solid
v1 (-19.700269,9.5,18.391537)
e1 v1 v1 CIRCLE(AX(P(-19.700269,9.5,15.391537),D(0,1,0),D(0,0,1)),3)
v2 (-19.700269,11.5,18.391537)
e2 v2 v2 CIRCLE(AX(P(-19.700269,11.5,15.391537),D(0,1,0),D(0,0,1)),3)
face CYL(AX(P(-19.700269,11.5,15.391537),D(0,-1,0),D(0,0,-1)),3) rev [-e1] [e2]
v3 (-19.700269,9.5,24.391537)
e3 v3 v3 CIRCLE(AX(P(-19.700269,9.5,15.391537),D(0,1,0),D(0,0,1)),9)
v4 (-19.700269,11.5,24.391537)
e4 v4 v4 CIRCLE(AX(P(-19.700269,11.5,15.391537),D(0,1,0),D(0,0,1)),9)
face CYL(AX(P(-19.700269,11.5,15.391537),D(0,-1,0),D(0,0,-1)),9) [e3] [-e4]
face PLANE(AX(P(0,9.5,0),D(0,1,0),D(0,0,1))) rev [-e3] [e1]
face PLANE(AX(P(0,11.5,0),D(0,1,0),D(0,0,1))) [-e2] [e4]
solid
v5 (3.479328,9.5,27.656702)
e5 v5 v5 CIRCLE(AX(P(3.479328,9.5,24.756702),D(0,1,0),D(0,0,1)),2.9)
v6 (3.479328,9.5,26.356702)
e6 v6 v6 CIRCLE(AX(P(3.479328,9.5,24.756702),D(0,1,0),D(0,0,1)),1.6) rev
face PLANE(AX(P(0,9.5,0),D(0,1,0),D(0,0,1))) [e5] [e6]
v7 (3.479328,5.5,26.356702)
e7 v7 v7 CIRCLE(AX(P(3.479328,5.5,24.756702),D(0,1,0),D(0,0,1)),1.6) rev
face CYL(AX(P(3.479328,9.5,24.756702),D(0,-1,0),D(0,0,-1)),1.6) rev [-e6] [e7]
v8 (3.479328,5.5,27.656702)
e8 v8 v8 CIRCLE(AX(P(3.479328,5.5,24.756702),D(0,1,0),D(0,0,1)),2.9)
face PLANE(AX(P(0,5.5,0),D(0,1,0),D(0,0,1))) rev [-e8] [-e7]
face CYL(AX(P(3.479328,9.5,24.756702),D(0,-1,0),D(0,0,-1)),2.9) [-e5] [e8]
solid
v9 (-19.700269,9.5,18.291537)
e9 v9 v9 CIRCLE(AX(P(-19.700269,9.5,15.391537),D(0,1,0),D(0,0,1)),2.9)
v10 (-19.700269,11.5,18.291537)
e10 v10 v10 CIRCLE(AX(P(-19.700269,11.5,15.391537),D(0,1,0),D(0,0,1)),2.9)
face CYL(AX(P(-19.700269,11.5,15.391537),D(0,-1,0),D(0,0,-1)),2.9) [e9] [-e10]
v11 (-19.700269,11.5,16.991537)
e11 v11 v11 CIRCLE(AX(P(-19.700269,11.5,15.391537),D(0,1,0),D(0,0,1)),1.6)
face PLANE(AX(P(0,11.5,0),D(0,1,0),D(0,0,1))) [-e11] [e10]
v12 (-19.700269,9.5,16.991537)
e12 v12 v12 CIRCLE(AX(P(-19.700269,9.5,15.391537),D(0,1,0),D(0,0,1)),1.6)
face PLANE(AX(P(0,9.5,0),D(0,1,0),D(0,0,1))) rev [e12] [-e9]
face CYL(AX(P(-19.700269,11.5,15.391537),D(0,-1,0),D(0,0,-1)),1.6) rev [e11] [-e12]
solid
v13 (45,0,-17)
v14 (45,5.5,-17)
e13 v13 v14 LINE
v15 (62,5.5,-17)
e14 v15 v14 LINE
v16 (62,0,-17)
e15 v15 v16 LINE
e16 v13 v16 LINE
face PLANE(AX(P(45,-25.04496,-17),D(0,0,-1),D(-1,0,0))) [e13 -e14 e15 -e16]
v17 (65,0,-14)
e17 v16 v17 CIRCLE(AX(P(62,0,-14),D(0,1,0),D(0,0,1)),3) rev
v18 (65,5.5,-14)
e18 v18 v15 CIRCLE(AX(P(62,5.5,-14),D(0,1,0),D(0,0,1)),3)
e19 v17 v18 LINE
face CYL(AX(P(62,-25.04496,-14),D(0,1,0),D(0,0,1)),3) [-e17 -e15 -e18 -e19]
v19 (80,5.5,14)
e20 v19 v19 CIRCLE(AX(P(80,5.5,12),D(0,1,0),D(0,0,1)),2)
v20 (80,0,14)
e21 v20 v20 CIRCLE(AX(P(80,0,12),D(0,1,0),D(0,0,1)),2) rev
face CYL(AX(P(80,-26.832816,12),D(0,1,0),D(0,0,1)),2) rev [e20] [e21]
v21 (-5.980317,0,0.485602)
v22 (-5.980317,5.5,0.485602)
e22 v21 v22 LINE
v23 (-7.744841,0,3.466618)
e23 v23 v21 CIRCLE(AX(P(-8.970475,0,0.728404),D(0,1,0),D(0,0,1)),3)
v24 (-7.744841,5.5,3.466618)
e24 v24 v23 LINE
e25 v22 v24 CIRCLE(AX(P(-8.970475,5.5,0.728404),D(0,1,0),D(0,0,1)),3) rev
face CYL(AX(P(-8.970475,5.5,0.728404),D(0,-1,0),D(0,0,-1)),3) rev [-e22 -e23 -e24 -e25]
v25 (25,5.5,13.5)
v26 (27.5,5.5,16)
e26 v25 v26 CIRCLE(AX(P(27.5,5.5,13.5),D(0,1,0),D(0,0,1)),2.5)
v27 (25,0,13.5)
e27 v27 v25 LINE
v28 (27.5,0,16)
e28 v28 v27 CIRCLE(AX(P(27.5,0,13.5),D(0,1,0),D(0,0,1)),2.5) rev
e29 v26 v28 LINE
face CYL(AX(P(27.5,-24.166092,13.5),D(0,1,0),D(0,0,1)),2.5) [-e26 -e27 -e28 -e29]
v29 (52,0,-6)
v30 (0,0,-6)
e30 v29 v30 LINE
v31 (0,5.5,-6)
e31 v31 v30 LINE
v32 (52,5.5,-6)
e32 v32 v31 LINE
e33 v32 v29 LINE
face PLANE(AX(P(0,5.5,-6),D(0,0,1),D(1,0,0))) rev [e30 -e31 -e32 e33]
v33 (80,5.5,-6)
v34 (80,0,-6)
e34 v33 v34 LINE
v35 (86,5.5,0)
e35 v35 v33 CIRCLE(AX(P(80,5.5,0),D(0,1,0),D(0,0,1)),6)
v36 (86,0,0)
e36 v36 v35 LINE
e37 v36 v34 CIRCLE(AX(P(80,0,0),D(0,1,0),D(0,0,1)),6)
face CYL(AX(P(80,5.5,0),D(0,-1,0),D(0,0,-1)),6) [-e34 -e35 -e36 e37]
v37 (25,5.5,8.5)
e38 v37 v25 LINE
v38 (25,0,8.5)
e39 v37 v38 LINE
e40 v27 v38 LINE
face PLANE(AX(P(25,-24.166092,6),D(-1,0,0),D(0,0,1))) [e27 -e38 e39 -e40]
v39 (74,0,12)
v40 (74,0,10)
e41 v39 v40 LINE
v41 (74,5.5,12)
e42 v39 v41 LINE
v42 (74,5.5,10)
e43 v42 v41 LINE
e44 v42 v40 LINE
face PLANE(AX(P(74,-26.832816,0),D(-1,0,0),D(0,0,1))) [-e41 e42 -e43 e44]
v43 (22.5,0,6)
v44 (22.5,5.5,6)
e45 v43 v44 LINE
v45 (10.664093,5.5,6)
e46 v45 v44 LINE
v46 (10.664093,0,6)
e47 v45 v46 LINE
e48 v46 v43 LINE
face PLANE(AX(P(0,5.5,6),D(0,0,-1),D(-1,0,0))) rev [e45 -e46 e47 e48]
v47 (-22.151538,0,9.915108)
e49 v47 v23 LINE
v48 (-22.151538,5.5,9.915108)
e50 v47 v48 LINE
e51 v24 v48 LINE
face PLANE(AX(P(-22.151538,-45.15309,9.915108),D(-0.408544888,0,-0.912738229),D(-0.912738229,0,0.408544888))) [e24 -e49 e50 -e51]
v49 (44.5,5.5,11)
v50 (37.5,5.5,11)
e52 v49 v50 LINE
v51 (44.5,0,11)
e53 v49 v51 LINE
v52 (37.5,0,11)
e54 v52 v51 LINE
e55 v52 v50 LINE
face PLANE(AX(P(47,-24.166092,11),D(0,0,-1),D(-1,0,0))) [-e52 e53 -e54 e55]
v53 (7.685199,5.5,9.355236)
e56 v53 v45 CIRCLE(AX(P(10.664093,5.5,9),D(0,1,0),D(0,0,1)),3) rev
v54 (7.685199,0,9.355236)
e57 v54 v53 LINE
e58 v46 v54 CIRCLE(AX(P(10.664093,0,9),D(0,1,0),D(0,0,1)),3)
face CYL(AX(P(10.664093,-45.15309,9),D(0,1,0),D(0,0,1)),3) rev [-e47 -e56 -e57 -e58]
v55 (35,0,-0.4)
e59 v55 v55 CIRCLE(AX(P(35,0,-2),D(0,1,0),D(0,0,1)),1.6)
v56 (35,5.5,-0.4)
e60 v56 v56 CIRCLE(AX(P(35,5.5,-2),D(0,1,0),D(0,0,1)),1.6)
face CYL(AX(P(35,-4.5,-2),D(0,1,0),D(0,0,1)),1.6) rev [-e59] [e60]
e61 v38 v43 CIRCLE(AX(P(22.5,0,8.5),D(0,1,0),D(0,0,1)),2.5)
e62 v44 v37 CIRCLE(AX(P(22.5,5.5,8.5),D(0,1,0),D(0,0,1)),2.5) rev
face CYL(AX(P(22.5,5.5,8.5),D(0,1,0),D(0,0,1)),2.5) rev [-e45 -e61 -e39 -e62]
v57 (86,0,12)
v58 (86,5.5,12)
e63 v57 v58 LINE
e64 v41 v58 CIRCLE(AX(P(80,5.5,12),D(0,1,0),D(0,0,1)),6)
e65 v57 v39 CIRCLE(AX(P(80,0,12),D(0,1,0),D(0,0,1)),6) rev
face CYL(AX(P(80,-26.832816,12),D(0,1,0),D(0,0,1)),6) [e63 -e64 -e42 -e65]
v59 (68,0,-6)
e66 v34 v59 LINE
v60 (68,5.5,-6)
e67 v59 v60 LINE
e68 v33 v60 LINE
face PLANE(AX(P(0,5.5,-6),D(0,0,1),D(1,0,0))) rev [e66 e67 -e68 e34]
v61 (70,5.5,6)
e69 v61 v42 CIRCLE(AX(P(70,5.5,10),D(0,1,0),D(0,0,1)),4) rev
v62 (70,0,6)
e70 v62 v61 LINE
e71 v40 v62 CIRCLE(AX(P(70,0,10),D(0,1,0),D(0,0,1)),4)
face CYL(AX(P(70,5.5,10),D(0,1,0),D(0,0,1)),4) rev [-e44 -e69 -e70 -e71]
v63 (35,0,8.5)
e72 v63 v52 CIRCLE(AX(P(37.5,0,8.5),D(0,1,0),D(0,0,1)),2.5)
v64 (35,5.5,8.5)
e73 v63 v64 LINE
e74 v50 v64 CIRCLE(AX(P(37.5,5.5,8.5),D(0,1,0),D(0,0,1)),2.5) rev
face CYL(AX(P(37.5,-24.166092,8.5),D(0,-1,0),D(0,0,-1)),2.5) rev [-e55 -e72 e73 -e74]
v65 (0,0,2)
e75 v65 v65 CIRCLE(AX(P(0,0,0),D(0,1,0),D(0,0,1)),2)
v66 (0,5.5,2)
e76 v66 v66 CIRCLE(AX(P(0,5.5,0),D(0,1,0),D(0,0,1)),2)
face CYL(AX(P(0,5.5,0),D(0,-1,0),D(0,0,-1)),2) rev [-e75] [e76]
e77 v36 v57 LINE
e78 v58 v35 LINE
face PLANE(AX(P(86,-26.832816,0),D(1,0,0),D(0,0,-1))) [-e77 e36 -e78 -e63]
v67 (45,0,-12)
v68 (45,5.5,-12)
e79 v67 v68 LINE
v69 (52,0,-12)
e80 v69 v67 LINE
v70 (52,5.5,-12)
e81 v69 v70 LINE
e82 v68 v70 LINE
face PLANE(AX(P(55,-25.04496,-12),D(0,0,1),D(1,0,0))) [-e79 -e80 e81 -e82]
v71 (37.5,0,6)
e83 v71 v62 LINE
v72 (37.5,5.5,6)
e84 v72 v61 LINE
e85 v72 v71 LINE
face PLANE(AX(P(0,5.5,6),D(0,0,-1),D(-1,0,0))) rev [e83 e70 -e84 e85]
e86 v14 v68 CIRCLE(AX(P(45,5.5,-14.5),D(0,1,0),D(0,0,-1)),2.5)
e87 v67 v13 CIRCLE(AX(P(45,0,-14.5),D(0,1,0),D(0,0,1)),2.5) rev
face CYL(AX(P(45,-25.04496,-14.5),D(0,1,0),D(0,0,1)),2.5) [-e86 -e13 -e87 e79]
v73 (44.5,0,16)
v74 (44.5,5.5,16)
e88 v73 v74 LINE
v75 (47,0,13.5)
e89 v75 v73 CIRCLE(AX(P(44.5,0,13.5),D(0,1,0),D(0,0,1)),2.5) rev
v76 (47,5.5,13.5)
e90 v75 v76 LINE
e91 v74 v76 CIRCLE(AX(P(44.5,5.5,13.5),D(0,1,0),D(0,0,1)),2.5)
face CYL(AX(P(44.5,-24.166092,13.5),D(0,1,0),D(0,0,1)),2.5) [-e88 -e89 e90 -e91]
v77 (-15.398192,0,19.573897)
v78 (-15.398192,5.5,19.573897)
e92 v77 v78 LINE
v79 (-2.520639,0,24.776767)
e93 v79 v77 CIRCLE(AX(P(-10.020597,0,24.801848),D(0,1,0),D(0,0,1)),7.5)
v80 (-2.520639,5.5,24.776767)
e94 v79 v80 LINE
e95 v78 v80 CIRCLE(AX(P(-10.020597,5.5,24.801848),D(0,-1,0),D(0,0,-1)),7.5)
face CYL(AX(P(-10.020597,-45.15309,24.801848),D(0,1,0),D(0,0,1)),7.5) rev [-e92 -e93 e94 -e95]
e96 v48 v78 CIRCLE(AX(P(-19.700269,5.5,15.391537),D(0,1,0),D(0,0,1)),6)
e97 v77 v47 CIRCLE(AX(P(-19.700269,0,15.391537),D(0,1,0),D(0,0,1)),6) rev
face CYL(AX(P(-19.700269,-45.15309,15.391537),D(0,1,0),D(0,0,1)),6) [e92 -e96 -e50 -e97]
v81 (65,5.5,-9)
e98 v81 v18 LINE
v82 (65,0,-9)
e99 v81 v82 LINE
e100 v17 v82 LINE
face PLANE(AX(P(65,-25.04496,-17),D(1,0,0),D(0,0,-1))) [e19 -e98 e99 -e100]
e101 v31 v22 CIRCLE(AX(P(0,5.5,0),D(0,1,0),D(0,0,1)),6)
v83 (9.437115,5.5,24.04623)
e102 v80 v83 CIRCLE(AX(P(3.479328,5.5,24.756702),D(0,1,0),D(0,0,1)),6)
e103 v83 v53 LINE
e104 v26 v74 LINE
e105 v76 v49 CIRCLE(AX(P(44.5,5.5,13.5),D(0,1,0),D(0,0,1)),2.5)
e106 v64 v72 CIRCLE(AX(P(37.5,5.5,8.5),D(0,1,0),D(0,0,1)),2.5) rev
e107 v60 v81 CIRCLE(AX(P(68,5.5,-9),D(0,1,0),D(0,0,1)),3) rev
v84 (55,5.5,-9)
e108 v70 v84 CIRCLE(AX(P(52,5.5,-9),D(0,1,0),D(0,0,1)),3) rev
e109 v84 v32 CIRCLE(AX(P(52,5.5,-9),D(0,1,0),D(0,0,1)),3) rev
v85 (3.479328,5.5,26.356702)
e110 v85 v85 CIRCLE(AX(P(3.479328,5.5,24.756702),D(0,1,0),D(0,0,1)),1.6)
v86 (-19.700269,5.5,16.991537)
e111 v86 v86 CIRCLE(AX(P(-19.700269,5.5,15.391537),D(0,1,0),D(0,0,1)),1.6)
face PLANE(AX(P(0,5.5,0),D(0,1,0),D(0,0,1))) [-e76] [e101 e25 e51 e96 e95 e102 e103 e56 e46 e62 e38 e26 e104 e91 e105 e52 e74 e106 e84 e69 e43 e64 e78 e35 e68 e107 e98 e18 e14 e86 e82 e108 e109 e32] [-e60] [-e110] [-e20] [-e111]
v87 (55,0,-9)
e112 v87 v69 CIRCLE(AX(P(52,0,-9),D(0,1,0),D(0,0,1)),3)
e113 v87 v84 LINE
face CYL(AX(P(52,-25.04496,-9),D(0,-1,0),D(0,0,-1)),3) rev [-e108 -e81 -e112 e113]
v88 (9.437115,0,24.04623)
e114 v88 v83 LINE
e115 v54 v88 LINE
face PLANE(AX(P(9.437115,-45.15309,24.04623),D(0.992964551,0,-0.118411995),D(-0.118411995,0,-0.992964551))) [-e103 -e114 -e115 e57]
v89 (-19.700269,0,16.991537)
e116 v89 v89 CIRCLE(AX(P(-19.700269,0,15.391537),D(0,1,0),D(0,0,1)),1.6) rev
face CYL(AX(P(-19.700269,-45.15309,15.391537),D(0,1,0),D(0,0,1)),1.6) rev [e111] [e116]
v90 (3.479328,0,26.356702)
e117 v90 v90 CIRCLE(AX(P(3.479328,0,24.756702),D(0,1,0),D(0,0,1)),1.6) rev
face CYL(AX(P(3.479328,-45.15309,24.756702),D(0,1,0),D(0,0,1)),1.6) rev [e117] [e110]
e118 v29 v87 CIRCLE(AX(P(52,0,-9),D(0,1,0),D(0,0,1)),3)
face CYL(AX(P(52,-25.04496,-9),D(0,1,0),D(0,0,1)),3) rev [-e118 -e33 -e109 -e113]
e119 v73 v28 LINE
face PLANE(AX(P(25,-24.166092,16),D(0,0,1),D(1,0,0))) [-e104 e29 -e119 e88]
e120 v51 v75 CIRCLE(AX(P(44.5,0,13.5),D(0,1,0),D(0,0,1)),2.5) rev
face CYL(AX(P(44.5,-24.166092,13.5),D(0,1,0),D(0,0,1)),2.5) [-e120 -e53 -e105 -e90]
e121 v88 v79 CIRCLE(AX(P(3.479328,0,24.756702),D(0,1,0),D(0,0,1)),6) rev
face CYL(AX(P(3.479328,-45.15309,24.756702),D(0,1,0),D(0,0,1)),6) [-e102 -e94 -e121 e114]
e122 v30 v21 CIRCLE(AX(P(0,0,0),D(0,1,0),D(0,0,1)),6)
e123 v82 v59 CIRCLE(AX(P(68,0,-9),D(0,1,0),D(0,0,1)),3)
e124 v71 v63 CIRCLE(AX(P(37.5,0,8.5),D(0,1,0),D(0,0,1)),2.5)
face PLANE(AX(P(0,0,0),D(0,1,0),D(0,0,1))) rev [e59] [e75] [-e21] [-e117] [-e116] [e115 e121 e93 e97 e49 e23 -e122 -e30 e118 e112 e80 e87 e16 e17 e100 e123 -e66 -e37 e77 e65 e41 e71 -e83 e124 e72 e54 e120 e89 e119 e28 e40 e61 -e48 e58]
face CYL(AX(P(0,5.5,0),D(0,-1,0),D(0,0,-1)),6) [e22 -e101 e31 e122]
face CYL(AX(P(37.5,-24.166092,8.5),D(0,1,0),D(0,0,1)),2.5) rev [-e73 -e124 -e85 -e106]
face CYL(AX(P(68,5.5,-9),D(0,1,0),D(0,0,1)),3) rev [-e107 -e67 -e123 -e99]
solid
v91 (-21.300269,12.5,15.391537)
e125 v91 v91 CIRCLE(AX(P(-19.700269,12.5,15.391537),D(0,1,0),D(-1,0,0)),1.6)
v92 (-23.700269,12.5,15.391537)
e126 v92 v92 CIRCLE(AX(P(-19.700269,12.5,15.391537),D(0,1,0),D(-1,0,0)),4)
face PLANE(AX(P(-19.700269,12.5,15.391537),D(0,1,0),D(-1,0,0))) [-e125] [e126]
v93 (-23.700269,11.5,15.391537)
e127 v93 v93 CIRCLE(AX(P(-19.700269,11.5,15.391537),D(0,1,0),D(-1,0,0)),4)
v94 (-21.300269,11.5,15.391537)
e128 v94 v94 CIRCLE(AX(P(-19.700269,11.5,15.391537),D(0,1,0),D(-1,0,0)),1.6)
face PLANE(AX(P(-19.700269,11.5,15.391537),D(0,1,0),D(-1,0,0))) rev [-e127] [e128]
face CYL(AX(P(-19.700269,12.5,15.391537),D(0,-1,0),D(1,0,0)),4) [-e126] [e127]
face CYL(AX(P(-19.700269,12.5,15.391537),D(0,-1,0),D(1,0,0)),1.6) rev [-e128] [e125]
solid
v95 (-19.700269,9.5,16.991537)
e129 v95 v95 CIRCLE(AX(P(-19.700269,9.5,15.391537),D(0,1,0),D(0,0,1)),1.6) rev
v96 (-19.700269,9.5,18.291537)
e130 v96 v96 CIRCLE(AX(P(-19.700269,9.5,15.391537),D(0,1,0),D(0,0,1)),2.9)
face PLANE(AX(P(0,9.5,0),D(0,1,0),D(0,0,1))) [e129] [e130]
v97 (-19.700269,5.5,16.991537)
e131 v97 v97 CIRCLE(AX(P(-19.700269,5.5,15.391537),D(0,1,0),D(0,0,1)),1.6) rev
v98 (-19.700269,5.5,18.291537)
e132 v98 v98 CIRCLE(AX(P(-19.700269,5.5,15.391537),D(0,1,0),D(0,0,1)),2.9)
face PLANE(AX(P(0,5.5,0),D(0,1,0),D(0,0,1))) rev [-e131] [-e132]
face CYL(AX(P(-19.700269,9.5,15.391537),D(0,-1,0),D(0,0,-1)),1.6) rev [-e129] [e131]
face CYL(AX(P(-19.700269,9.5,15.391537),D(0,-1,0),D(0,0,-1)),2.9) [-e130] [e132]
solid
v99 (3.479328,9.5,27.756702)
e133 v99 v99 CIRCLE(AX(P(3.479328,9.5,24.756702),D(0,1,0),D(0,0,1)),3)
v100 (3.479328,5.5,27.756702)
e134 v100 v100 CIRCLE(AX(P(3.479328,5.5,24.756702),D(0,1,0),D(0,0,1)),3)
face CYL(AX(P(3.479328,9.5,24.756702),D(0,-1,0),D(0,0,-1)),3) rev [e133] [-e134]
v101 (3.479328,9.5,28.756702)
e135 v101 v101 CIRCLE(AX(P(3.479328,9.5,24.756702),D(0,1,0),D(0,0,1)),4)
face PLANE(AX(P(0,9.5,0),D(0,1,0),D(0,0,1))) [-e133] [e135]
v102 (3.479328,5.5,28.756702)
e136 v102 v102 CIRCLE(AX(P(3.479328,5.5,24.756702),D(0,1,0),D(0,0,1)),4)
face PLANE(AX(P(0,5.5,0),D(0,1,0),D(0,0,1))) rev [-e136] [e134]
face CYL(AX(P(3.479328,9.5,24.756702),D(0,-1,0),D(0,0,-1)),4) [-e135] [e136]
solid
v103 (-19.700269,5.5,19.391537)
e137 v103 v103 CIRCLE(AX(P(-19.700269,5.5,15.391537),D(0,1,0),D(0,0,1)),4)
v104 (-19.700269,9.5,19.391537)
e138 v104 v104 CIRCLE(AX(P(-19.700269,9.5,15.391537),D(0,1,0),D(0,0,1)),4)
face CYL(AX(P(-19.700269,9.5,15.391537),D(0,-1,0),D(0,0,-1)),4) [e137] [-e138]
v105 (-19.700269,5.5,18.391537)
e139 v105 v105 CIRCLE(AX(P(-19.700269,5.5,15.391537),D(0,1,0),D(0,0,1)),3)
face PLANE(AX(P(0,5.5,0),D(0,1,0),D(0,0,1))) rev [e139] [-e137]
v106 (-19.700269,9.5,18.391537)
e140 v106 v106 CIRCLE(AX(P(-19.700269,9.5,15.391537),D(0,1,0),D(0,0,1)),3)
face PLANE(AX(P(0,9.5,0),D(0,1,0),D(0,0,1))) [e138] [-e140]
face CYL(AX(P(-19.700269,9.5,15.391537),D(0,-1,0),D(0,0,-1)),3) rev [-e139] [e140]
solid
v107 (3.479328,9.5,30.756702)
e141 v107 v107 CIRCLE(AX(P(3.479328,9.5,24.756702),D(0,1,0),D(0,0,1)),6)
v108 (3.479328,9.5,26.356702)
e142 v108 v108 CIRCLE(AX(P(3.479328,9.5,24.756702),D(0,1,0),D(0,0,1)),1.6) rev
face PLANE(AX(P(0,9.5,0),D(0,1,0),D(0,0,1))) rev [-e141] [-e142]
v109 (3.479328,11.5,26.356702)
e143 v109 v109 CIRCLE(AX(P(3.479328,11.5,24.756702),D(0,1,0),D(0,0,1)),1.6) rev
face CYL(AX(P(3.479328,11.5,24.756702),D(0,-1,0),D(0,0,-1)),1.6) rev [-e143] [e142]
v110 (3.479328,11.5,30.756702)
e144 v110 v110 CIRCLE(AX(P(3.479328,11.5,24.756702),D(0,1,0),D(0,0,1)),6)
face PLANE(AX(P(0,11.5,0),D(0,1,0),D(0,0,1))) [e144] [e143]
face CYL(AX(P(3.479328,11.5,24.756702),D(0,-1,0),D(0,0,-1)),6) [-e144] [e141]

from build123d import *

# Parameters (mm, degrees)
SKETCH_1_R          = 2
EXTRUDE_1_DEPTH     = 5.5
EXTRUDE_START       = -5.5
SKETCH_3_R          = 2
EXTRUDE_3_DEPTH     = 5.5
FILLET_1_R          = 4
SKETCH_4_R          = 1.6
CUT_EXTRUDE_1_DEPTH = 10
EXTRUDE_5_DEPTH     = 5.5
FILLET_3_R          = 3
SKETCH_9_R          = 1.6
EXTRUDE_7_DEPTH     = 5.5
FILLET_5_R          = 3
SKETCH_10_R         = 2.9
SKETCH_10_R_2       = 1.6
EXTRUDE_8_DEPTH     = 4
SKETCH_10_R_3       = 4
SKETCH_10_R_4       = 3
EXTRUDE_8_2_DEPTH   = 4
EXTRUDE_8_3_DEPTH   = 4
EXTRUDE_8_4_DEPTH   = 4
SKETCH_11_R         = 9
SKETCH_11_R_2       = 3
SKETCH_11_R_3       = 6
SKETCH_11_R_4       = 2.9
SKETCH_11_R_5       = 1.6
EXTRUDE_9_DEPTH     = 2
EXTRUDE_10_DEPTH    = 5.5
FILLET_START        = -1
FILLET_6_DEPTH      = 7
FILLET_6_2_DEPTH    = 5.5
SKETCH_15_R         = 4
SKETCH_15_R_2       = 1.6
EXTRUDE_11_DEPTH    = 1


with BuildPart() as part:
    # ｽｹｯﾁ1 → ﾎﾞｽ - 押し出し1 (new body)
    with BuildSketch(Plane(origin=(0, 0, 0), x_dir=(1, 0, 0), z_dir=(0, 1, 0))):
        with BuildLine():
            Line((0, 6), (80, 6))
            ThreePointArc((80, 6), (86, 0), (80, -6))
            Line((80, -6), (0, -6))
            ThreePointArc((0, -6), (-6, 0), (0, 6))
        make_face()
        with Locations(Location((0, 0, 0), (0, 0, 270))):
            Circle(SKETCH_1_R, mode=Mode.SUBTRACT)
    extrude(amount=EXTRUDE_1_DEPTH)

    # ｽｹｯﾁ3 → ﾎﾞｽ - 押し出し3 (add)
    with BuildSketch(Plane(origin=(0, 5.5, 0), x_dir=(1, 0, 0), z_dir=(0, 1, 0)).offset(EXTRUDE_START)):
        with BuildLine():
            Line((86, 0), (86, -12))
            ThreePointArc((86, -12), (80, -18), (74, -12))
            Line((74, -12), (74, 0))
            ThreePointArc((74, 0), (80, 6), (86, 0))
        make_face()
        with Locations(Location((80, -12, 0), (0, 0, 270))):
            Circle(SKETCH_3_R, mode=Mode.SUBTRACT)
    extrude(amount=EXTRUDE_3_DEPTH)

    # ﾌｨﾚｯﾄ1
    fillet_1_edges = [part.edges().sort_by_distance(p)[0] for p in [
        (74, 2.75, 6),
    ]]
    fillet(fillet_1_edges, radius=FILLET_1_R)

    # ｽｹｯﾁ4 → ｶｯﾄ - 押し出し1 (cut)
    with BuildSketch(Plane(origin=(0, 5.5, 0), x_dir=(1, 0, 0), z_dir=(0, 1, 0))):
        with Locations(Location((35, 2, 0), (0, 0, 270))):
            Circle(SKETCH_4_R)
    extrude(amount=-CUT_EXTRUDE_1_DEPTH, mode=Mode.SUBTRACT)

    # ｽｹｯﾁ7 → ﾎﾞｽ - 押し出し5 (add)
    with BuildSketch(Plane(origin=(0, 5.5, 0), x_dir=(1, 0, 0), z_dir=(0, 1, 0))):
        with BuildLine():
            Line((55, 6), (55, 12))
            Line((55, 12), (45, 12))
            ThreePointArc((45, 12), (42.5, 14.5), (45, 17))
            Line((45, 17), (65, 17))
            Line((65, 17), (65, 6))
            Line((65, 6), (55, 6))
        make_face()
    extrude(amount=-EXTRUDE_5_DEPTH)

    # ﾌｨﾚｯﾄ3
    fillet_3_edges = [part.edges().sort_by_distance(p)[0] for p in [
        (65, 2.75, -6),
        (65, 2.75, -17),
        (55, 2.75, -12),
        (55, 2.75, -6),
    ]]
    fillet(fillet_3_edges, radius=FILLET_3_R - 0.0001)  # a hair under: the kernel refuses the full size

    # ｽｹｯﾁ9 → ﾎﾞｽ - 押し出し7 (add)
    with BuildSketch(Plane(origin=(0, 5.5, 0), x_dir=(1, 0, 0), z_dir=(0, 1, 0)).offset(EXTRUDE_START)):
        with BuildLine():
            Line((-22.151538165, -9.915107509), (-5.476429375, -2.451269325))
            ThreePointArc((-5.476429375, -2.451269325), (-3.262850291, -5.035256496), (0, -6))
            Line((0, -6), (7.285084265, -6))
            Line((7.285084265, -6), (9.43711483, -24.04622975))
            ThreePointArc((9.43711483, -24.04622975), (3.845204306, -30.745535844), (-2.520638926, -24.776766674))
            ThreePointArc((-2.520638926, -24.776766674), (-7.211047537, -17.847968959), (-15.398192461, -19.573897321))
            ThreePointArc((-15.398192461, -19.573897321), (-24.617526902, -18.829642925), (-22.151538165, -9.915107509))
        make_face()
        with Locations(Location((-19.70026884, -15.391536883, 0), (0, 0, 270))):
            Circle(SKETCH_9_R, mode=Mode.SUBTRACT)
        with Locations(Location((3.479327524, -24.756701719, 0), (0, 0, 270))):
            Circle(SKETCH_9_R, mode=Mode.SUBTRACT)
    extrude(amount=EXTRUDE_7_DEPTH)

    # ﾌｨﾚｯﾄ5
    fillet_5_edges = [part.edges().sort_by_distance(p)[0] for p in [
        (7.285084265, 2.75, 6),
        (-5.476429375, 2.75, 2.451269325),
    ]]
    fillet(fillet_5_edges, radius=FILLET_5_R)

    # ｽｹｯﾁ13 → ﾎﾞｽ - 押し出し10 (add)
    with BuildSketch(Plane(origin=(0, 5.5, 0), x_dir=(1, 0, 0), z_dir=(0, 1, 0))):
        Polygon((25, -6), (25, -16), (47, -16), (47, -11), (35, -11), (35, -6), align=None)
    extrude(amount=-EXTRUDE_10_DEPTH)

    # ﾌｨﾚｯﾄ6: read off the stored shape, not the designer's step
    # ﾌｨﾚｯﾄ6 outline → ﾌｨﾚｯﾄ6 (cut)
    with BuildSketch(Plane(origin=(0, 0, 0), x_dir=(1, 0, 0), z_dir=(0, 1, 0)).offset(FILLET_START)):
        with BuildLine():
            ThreePointArc((44.5, -11), (46.267766953, -11.732233047), (47, -13.5))
            Line((47, -13.5), (47, -11))
            Line((47, -11), (44.5, -11))
        make_face()
        with BuildLine():
            ThreePointArc((47, -13.5), (46.267766953, -15.267766953), (44.5, -16))
            Line((44.5, -16), (47, -16))
            Line((47, -16), (47, -13.5))
        make_face()
        with BuildLine():
            ThreePointArc((27.5, -16), (25.732233047, -15.267766953), (25, -13.5))
            Line((25, -13.5), (25, -16))
            Line((25, -16), (27.5, -16))
        make_face()
    extrude(amount=FILLET_6_DEPTH, mode=Mode.SUBTRACT)

    # Fillet 6 2 outline → Fillet 6 2 (add)
    with BuildSketch(Plane(origin=(0, 0, 0), x_dir=(1, 0, 0), z_dir=(0, 1, 0))):
        with BuildLine():
            ThreePointArc((22.5, -6), (24.267766953, -6.732233047), (25, -8.5))
            Line((25, -8.5), (25, -6))
            Line((25, -6), (22.5, -6))
        make_face()
        with BuildLine():
            Line((35, -6), (35, -8.5))
            ThreePointArc((35, -8.5), (35.732233047, -6.732233047), (37.5, -6))
            Line((37.5, -6), (35, -6))
        make_face()
        with BuildLine():
            Line((35, -11), (37.5, -11))
            ThreePointArc((37.5, -11), (35.732233047, -10.267766953), (35, -8.5))
            Line((35, -8.5), (35, -11))
        make_face()
    extrude(amount=FILLET_6_2_DEPTH)


with BuildPart() as body_2:
    # ｽｹｯﾁ10 → ﾎﾞｽ - 押し出し8 (new body)
    with BuildSketch(Plane(origin=(0, 5.5, 0), x_dir=(1, 0, 0), z_dir=(0, 1, 0))):
        with Locations(Location((3.479327524, -24.756701719, 0), (0, 0, 270))):
            Circle(SKETCH_10_R)
        with Locations(Location((3.479327524, -24.756701719, 0), (0, 0, 270))):
            Circle(SKETCH_10_R_2, mode=Mode.SUBTRACT)
    extrude(amount=EXTRUDE_8_DEPTH)


with BuildPart() as body_3:
    # ｽｹｯﾁ10 → Extrude 8 2 (new body)
    with BuildSketch(Plane(origin=(0, 5.5, 0), x_dir=(1, 0, 0), z_dir=(0, 1, 0))):
        with Locations(Location((3.479327524, -24.756701719, 0), (0, 0, 270))):
            Circle(SKETCH_10_R_3)
        with Locations(Location((3.479327524, -24.756701719, 0), (0, 0, 270))):
            Circle(SKETCH_10_R_4, mode=Mode.SUBTRACT)
    extrude(amount=EXTRUDE_8_2_DEPTH)


with BuildPart() as body_4:
    # ｽｹｯﾁ10 → Extrude 8 3 (new body)
    with BuildSketch(Plane(origin=(0, 5.5, 0), x_dir=(1, 0, 0), z_dir=(0, 1, 0))):
        with Locations(Location((-19.70026884, -15.391536883, 0), (0, 0, 270))):
            Circle(SKETCH_10_R)
        with Locations(Location((-19.70026884, -15.391536883, 0), (0, 0, 270))):
            Circle(SKETCH_10_R_2, mode=Mode.SUBTRACT)
    extrude(amount=EXTRUDE_8_3_DEPTH)


with BuildPart() as body_5:
    # ｽｹｯﾁ10 → Extrude 8 4 (new body)
    with BuildSketch(Plane(origin=(0, 5.5, 0), x_dir=(1, 0, 0), z_dir=(0, 1, 0))):
        with Locations(Location((-19.70026884, -15.391536883, 0), (0, 0, 270))):
            Circle(SKETCH_10_R_3)
        with Locations(Location((-19.70026884, -15.391536883, 0), (0, 0, 270))):
            Circle(SKETCH_10_R_4, mode=Mode.SUBTRACT)
    extrude(amount=EXTRUDE_8_4_DEPTH)


with BuildPart() as body_6:
    # ｽｹｯﾁ11 → ﾎﾞｽ - 押し出し9 (new body)
    # profile 1 of 4: a face of its own
    with BuildSketch(Plane(origin=(0, 9.5, 0), x_dir=(1, 0, 0), z_dir=(0, 1, 0))):
        with Locations(Location((-19.70026884, -15.391536883, 0), (0, 0, 270))):
            Circle(SKETCH_11_R)
        with Locations(Location((-19.70026884, -15.391536883, 0), (0, 0, 270))):
            Circle(SKETCH_11_R_2, mode=Mode.SUBTRACT)
    # profile 2 of 4: a face of its own
    with BuildSketch(Plane(origin=(0, 9.5, 0), x_dir=(1, 0, 0), z_dir=(0, 1, 0))):
        with Locations(Location((3.479327524, -24.756701719, 0), (0, 0, 270))):
            Circle(SKETCH_11_R_3)
        with Locations(Location((3.479327524, -24.756701719, 0), (0, 0, 270))):
            Circle(SKETCH_11_R_4, mode=Mode.SUBTRACT)
    # profile 3 of 4: a face of its own
    with BuildSketch(Plane(origin=(0, 9.5, 0), x_dir=(1, 0, 0), z_dir=(0, 1, 0))):
        with Locations(Location((3.479327524, -24.756701719, 0), (0, 0, 270))):
            Circle(SKETCH_11_R_4)
        with Locations(Location((3.479327524, -24.756701719, 0), (0, 0, 270))):
            Circle(SKETCH_11_R_5, mode=Mode.SUBTRACT)
    # profile 4 of 4: a face of its own
    with BuildSketch(Plane(origin=(0, 9.5, 0), x_dir=(1, 0, 0), z_dir=(0, 1, 0))):
        with Locations(Location((-19.70026884, -15.391536883, 0), (0, 0, 270))):
            Circle(SKETCH_11_R_4)
        with Locations(Location((-19.70026884, -15.391536883, 0), (0, 0, 270))):
            Circle(SKETCH_11_R_5, mode=Mode.SUBTRACT)
    extrude(amount=EXTRUDE_9_DEPTH)


with BuildPart() as body_7:
    # ｽｹｯﾁ15 → ﾎﾞｽ - 押し出し11 (new body)
    with BuildSketch(Plane(origin=(0, 11.5, 0), x_dir=(1, 0, 0), z_dir=(0, 1, 0))):
        with Locations(Location((-19.70026884, -15.391536883, 0), (0, 0, 180))):
            Circle(SKETCH_15_R)
        with Locations(Location((-19.70026884, -15.391536883, 0), (0, 0, 180))):
            Circle(SKETCH_15_R_2, mode=Mode.SUBTRACT)
    extrude(amount=EXTRUDE_11_DEPTH)


solid = Compound([part.part, body_2.part, body_3.part, body_4.part, body_5.part, body_6.part, body_7.part])
